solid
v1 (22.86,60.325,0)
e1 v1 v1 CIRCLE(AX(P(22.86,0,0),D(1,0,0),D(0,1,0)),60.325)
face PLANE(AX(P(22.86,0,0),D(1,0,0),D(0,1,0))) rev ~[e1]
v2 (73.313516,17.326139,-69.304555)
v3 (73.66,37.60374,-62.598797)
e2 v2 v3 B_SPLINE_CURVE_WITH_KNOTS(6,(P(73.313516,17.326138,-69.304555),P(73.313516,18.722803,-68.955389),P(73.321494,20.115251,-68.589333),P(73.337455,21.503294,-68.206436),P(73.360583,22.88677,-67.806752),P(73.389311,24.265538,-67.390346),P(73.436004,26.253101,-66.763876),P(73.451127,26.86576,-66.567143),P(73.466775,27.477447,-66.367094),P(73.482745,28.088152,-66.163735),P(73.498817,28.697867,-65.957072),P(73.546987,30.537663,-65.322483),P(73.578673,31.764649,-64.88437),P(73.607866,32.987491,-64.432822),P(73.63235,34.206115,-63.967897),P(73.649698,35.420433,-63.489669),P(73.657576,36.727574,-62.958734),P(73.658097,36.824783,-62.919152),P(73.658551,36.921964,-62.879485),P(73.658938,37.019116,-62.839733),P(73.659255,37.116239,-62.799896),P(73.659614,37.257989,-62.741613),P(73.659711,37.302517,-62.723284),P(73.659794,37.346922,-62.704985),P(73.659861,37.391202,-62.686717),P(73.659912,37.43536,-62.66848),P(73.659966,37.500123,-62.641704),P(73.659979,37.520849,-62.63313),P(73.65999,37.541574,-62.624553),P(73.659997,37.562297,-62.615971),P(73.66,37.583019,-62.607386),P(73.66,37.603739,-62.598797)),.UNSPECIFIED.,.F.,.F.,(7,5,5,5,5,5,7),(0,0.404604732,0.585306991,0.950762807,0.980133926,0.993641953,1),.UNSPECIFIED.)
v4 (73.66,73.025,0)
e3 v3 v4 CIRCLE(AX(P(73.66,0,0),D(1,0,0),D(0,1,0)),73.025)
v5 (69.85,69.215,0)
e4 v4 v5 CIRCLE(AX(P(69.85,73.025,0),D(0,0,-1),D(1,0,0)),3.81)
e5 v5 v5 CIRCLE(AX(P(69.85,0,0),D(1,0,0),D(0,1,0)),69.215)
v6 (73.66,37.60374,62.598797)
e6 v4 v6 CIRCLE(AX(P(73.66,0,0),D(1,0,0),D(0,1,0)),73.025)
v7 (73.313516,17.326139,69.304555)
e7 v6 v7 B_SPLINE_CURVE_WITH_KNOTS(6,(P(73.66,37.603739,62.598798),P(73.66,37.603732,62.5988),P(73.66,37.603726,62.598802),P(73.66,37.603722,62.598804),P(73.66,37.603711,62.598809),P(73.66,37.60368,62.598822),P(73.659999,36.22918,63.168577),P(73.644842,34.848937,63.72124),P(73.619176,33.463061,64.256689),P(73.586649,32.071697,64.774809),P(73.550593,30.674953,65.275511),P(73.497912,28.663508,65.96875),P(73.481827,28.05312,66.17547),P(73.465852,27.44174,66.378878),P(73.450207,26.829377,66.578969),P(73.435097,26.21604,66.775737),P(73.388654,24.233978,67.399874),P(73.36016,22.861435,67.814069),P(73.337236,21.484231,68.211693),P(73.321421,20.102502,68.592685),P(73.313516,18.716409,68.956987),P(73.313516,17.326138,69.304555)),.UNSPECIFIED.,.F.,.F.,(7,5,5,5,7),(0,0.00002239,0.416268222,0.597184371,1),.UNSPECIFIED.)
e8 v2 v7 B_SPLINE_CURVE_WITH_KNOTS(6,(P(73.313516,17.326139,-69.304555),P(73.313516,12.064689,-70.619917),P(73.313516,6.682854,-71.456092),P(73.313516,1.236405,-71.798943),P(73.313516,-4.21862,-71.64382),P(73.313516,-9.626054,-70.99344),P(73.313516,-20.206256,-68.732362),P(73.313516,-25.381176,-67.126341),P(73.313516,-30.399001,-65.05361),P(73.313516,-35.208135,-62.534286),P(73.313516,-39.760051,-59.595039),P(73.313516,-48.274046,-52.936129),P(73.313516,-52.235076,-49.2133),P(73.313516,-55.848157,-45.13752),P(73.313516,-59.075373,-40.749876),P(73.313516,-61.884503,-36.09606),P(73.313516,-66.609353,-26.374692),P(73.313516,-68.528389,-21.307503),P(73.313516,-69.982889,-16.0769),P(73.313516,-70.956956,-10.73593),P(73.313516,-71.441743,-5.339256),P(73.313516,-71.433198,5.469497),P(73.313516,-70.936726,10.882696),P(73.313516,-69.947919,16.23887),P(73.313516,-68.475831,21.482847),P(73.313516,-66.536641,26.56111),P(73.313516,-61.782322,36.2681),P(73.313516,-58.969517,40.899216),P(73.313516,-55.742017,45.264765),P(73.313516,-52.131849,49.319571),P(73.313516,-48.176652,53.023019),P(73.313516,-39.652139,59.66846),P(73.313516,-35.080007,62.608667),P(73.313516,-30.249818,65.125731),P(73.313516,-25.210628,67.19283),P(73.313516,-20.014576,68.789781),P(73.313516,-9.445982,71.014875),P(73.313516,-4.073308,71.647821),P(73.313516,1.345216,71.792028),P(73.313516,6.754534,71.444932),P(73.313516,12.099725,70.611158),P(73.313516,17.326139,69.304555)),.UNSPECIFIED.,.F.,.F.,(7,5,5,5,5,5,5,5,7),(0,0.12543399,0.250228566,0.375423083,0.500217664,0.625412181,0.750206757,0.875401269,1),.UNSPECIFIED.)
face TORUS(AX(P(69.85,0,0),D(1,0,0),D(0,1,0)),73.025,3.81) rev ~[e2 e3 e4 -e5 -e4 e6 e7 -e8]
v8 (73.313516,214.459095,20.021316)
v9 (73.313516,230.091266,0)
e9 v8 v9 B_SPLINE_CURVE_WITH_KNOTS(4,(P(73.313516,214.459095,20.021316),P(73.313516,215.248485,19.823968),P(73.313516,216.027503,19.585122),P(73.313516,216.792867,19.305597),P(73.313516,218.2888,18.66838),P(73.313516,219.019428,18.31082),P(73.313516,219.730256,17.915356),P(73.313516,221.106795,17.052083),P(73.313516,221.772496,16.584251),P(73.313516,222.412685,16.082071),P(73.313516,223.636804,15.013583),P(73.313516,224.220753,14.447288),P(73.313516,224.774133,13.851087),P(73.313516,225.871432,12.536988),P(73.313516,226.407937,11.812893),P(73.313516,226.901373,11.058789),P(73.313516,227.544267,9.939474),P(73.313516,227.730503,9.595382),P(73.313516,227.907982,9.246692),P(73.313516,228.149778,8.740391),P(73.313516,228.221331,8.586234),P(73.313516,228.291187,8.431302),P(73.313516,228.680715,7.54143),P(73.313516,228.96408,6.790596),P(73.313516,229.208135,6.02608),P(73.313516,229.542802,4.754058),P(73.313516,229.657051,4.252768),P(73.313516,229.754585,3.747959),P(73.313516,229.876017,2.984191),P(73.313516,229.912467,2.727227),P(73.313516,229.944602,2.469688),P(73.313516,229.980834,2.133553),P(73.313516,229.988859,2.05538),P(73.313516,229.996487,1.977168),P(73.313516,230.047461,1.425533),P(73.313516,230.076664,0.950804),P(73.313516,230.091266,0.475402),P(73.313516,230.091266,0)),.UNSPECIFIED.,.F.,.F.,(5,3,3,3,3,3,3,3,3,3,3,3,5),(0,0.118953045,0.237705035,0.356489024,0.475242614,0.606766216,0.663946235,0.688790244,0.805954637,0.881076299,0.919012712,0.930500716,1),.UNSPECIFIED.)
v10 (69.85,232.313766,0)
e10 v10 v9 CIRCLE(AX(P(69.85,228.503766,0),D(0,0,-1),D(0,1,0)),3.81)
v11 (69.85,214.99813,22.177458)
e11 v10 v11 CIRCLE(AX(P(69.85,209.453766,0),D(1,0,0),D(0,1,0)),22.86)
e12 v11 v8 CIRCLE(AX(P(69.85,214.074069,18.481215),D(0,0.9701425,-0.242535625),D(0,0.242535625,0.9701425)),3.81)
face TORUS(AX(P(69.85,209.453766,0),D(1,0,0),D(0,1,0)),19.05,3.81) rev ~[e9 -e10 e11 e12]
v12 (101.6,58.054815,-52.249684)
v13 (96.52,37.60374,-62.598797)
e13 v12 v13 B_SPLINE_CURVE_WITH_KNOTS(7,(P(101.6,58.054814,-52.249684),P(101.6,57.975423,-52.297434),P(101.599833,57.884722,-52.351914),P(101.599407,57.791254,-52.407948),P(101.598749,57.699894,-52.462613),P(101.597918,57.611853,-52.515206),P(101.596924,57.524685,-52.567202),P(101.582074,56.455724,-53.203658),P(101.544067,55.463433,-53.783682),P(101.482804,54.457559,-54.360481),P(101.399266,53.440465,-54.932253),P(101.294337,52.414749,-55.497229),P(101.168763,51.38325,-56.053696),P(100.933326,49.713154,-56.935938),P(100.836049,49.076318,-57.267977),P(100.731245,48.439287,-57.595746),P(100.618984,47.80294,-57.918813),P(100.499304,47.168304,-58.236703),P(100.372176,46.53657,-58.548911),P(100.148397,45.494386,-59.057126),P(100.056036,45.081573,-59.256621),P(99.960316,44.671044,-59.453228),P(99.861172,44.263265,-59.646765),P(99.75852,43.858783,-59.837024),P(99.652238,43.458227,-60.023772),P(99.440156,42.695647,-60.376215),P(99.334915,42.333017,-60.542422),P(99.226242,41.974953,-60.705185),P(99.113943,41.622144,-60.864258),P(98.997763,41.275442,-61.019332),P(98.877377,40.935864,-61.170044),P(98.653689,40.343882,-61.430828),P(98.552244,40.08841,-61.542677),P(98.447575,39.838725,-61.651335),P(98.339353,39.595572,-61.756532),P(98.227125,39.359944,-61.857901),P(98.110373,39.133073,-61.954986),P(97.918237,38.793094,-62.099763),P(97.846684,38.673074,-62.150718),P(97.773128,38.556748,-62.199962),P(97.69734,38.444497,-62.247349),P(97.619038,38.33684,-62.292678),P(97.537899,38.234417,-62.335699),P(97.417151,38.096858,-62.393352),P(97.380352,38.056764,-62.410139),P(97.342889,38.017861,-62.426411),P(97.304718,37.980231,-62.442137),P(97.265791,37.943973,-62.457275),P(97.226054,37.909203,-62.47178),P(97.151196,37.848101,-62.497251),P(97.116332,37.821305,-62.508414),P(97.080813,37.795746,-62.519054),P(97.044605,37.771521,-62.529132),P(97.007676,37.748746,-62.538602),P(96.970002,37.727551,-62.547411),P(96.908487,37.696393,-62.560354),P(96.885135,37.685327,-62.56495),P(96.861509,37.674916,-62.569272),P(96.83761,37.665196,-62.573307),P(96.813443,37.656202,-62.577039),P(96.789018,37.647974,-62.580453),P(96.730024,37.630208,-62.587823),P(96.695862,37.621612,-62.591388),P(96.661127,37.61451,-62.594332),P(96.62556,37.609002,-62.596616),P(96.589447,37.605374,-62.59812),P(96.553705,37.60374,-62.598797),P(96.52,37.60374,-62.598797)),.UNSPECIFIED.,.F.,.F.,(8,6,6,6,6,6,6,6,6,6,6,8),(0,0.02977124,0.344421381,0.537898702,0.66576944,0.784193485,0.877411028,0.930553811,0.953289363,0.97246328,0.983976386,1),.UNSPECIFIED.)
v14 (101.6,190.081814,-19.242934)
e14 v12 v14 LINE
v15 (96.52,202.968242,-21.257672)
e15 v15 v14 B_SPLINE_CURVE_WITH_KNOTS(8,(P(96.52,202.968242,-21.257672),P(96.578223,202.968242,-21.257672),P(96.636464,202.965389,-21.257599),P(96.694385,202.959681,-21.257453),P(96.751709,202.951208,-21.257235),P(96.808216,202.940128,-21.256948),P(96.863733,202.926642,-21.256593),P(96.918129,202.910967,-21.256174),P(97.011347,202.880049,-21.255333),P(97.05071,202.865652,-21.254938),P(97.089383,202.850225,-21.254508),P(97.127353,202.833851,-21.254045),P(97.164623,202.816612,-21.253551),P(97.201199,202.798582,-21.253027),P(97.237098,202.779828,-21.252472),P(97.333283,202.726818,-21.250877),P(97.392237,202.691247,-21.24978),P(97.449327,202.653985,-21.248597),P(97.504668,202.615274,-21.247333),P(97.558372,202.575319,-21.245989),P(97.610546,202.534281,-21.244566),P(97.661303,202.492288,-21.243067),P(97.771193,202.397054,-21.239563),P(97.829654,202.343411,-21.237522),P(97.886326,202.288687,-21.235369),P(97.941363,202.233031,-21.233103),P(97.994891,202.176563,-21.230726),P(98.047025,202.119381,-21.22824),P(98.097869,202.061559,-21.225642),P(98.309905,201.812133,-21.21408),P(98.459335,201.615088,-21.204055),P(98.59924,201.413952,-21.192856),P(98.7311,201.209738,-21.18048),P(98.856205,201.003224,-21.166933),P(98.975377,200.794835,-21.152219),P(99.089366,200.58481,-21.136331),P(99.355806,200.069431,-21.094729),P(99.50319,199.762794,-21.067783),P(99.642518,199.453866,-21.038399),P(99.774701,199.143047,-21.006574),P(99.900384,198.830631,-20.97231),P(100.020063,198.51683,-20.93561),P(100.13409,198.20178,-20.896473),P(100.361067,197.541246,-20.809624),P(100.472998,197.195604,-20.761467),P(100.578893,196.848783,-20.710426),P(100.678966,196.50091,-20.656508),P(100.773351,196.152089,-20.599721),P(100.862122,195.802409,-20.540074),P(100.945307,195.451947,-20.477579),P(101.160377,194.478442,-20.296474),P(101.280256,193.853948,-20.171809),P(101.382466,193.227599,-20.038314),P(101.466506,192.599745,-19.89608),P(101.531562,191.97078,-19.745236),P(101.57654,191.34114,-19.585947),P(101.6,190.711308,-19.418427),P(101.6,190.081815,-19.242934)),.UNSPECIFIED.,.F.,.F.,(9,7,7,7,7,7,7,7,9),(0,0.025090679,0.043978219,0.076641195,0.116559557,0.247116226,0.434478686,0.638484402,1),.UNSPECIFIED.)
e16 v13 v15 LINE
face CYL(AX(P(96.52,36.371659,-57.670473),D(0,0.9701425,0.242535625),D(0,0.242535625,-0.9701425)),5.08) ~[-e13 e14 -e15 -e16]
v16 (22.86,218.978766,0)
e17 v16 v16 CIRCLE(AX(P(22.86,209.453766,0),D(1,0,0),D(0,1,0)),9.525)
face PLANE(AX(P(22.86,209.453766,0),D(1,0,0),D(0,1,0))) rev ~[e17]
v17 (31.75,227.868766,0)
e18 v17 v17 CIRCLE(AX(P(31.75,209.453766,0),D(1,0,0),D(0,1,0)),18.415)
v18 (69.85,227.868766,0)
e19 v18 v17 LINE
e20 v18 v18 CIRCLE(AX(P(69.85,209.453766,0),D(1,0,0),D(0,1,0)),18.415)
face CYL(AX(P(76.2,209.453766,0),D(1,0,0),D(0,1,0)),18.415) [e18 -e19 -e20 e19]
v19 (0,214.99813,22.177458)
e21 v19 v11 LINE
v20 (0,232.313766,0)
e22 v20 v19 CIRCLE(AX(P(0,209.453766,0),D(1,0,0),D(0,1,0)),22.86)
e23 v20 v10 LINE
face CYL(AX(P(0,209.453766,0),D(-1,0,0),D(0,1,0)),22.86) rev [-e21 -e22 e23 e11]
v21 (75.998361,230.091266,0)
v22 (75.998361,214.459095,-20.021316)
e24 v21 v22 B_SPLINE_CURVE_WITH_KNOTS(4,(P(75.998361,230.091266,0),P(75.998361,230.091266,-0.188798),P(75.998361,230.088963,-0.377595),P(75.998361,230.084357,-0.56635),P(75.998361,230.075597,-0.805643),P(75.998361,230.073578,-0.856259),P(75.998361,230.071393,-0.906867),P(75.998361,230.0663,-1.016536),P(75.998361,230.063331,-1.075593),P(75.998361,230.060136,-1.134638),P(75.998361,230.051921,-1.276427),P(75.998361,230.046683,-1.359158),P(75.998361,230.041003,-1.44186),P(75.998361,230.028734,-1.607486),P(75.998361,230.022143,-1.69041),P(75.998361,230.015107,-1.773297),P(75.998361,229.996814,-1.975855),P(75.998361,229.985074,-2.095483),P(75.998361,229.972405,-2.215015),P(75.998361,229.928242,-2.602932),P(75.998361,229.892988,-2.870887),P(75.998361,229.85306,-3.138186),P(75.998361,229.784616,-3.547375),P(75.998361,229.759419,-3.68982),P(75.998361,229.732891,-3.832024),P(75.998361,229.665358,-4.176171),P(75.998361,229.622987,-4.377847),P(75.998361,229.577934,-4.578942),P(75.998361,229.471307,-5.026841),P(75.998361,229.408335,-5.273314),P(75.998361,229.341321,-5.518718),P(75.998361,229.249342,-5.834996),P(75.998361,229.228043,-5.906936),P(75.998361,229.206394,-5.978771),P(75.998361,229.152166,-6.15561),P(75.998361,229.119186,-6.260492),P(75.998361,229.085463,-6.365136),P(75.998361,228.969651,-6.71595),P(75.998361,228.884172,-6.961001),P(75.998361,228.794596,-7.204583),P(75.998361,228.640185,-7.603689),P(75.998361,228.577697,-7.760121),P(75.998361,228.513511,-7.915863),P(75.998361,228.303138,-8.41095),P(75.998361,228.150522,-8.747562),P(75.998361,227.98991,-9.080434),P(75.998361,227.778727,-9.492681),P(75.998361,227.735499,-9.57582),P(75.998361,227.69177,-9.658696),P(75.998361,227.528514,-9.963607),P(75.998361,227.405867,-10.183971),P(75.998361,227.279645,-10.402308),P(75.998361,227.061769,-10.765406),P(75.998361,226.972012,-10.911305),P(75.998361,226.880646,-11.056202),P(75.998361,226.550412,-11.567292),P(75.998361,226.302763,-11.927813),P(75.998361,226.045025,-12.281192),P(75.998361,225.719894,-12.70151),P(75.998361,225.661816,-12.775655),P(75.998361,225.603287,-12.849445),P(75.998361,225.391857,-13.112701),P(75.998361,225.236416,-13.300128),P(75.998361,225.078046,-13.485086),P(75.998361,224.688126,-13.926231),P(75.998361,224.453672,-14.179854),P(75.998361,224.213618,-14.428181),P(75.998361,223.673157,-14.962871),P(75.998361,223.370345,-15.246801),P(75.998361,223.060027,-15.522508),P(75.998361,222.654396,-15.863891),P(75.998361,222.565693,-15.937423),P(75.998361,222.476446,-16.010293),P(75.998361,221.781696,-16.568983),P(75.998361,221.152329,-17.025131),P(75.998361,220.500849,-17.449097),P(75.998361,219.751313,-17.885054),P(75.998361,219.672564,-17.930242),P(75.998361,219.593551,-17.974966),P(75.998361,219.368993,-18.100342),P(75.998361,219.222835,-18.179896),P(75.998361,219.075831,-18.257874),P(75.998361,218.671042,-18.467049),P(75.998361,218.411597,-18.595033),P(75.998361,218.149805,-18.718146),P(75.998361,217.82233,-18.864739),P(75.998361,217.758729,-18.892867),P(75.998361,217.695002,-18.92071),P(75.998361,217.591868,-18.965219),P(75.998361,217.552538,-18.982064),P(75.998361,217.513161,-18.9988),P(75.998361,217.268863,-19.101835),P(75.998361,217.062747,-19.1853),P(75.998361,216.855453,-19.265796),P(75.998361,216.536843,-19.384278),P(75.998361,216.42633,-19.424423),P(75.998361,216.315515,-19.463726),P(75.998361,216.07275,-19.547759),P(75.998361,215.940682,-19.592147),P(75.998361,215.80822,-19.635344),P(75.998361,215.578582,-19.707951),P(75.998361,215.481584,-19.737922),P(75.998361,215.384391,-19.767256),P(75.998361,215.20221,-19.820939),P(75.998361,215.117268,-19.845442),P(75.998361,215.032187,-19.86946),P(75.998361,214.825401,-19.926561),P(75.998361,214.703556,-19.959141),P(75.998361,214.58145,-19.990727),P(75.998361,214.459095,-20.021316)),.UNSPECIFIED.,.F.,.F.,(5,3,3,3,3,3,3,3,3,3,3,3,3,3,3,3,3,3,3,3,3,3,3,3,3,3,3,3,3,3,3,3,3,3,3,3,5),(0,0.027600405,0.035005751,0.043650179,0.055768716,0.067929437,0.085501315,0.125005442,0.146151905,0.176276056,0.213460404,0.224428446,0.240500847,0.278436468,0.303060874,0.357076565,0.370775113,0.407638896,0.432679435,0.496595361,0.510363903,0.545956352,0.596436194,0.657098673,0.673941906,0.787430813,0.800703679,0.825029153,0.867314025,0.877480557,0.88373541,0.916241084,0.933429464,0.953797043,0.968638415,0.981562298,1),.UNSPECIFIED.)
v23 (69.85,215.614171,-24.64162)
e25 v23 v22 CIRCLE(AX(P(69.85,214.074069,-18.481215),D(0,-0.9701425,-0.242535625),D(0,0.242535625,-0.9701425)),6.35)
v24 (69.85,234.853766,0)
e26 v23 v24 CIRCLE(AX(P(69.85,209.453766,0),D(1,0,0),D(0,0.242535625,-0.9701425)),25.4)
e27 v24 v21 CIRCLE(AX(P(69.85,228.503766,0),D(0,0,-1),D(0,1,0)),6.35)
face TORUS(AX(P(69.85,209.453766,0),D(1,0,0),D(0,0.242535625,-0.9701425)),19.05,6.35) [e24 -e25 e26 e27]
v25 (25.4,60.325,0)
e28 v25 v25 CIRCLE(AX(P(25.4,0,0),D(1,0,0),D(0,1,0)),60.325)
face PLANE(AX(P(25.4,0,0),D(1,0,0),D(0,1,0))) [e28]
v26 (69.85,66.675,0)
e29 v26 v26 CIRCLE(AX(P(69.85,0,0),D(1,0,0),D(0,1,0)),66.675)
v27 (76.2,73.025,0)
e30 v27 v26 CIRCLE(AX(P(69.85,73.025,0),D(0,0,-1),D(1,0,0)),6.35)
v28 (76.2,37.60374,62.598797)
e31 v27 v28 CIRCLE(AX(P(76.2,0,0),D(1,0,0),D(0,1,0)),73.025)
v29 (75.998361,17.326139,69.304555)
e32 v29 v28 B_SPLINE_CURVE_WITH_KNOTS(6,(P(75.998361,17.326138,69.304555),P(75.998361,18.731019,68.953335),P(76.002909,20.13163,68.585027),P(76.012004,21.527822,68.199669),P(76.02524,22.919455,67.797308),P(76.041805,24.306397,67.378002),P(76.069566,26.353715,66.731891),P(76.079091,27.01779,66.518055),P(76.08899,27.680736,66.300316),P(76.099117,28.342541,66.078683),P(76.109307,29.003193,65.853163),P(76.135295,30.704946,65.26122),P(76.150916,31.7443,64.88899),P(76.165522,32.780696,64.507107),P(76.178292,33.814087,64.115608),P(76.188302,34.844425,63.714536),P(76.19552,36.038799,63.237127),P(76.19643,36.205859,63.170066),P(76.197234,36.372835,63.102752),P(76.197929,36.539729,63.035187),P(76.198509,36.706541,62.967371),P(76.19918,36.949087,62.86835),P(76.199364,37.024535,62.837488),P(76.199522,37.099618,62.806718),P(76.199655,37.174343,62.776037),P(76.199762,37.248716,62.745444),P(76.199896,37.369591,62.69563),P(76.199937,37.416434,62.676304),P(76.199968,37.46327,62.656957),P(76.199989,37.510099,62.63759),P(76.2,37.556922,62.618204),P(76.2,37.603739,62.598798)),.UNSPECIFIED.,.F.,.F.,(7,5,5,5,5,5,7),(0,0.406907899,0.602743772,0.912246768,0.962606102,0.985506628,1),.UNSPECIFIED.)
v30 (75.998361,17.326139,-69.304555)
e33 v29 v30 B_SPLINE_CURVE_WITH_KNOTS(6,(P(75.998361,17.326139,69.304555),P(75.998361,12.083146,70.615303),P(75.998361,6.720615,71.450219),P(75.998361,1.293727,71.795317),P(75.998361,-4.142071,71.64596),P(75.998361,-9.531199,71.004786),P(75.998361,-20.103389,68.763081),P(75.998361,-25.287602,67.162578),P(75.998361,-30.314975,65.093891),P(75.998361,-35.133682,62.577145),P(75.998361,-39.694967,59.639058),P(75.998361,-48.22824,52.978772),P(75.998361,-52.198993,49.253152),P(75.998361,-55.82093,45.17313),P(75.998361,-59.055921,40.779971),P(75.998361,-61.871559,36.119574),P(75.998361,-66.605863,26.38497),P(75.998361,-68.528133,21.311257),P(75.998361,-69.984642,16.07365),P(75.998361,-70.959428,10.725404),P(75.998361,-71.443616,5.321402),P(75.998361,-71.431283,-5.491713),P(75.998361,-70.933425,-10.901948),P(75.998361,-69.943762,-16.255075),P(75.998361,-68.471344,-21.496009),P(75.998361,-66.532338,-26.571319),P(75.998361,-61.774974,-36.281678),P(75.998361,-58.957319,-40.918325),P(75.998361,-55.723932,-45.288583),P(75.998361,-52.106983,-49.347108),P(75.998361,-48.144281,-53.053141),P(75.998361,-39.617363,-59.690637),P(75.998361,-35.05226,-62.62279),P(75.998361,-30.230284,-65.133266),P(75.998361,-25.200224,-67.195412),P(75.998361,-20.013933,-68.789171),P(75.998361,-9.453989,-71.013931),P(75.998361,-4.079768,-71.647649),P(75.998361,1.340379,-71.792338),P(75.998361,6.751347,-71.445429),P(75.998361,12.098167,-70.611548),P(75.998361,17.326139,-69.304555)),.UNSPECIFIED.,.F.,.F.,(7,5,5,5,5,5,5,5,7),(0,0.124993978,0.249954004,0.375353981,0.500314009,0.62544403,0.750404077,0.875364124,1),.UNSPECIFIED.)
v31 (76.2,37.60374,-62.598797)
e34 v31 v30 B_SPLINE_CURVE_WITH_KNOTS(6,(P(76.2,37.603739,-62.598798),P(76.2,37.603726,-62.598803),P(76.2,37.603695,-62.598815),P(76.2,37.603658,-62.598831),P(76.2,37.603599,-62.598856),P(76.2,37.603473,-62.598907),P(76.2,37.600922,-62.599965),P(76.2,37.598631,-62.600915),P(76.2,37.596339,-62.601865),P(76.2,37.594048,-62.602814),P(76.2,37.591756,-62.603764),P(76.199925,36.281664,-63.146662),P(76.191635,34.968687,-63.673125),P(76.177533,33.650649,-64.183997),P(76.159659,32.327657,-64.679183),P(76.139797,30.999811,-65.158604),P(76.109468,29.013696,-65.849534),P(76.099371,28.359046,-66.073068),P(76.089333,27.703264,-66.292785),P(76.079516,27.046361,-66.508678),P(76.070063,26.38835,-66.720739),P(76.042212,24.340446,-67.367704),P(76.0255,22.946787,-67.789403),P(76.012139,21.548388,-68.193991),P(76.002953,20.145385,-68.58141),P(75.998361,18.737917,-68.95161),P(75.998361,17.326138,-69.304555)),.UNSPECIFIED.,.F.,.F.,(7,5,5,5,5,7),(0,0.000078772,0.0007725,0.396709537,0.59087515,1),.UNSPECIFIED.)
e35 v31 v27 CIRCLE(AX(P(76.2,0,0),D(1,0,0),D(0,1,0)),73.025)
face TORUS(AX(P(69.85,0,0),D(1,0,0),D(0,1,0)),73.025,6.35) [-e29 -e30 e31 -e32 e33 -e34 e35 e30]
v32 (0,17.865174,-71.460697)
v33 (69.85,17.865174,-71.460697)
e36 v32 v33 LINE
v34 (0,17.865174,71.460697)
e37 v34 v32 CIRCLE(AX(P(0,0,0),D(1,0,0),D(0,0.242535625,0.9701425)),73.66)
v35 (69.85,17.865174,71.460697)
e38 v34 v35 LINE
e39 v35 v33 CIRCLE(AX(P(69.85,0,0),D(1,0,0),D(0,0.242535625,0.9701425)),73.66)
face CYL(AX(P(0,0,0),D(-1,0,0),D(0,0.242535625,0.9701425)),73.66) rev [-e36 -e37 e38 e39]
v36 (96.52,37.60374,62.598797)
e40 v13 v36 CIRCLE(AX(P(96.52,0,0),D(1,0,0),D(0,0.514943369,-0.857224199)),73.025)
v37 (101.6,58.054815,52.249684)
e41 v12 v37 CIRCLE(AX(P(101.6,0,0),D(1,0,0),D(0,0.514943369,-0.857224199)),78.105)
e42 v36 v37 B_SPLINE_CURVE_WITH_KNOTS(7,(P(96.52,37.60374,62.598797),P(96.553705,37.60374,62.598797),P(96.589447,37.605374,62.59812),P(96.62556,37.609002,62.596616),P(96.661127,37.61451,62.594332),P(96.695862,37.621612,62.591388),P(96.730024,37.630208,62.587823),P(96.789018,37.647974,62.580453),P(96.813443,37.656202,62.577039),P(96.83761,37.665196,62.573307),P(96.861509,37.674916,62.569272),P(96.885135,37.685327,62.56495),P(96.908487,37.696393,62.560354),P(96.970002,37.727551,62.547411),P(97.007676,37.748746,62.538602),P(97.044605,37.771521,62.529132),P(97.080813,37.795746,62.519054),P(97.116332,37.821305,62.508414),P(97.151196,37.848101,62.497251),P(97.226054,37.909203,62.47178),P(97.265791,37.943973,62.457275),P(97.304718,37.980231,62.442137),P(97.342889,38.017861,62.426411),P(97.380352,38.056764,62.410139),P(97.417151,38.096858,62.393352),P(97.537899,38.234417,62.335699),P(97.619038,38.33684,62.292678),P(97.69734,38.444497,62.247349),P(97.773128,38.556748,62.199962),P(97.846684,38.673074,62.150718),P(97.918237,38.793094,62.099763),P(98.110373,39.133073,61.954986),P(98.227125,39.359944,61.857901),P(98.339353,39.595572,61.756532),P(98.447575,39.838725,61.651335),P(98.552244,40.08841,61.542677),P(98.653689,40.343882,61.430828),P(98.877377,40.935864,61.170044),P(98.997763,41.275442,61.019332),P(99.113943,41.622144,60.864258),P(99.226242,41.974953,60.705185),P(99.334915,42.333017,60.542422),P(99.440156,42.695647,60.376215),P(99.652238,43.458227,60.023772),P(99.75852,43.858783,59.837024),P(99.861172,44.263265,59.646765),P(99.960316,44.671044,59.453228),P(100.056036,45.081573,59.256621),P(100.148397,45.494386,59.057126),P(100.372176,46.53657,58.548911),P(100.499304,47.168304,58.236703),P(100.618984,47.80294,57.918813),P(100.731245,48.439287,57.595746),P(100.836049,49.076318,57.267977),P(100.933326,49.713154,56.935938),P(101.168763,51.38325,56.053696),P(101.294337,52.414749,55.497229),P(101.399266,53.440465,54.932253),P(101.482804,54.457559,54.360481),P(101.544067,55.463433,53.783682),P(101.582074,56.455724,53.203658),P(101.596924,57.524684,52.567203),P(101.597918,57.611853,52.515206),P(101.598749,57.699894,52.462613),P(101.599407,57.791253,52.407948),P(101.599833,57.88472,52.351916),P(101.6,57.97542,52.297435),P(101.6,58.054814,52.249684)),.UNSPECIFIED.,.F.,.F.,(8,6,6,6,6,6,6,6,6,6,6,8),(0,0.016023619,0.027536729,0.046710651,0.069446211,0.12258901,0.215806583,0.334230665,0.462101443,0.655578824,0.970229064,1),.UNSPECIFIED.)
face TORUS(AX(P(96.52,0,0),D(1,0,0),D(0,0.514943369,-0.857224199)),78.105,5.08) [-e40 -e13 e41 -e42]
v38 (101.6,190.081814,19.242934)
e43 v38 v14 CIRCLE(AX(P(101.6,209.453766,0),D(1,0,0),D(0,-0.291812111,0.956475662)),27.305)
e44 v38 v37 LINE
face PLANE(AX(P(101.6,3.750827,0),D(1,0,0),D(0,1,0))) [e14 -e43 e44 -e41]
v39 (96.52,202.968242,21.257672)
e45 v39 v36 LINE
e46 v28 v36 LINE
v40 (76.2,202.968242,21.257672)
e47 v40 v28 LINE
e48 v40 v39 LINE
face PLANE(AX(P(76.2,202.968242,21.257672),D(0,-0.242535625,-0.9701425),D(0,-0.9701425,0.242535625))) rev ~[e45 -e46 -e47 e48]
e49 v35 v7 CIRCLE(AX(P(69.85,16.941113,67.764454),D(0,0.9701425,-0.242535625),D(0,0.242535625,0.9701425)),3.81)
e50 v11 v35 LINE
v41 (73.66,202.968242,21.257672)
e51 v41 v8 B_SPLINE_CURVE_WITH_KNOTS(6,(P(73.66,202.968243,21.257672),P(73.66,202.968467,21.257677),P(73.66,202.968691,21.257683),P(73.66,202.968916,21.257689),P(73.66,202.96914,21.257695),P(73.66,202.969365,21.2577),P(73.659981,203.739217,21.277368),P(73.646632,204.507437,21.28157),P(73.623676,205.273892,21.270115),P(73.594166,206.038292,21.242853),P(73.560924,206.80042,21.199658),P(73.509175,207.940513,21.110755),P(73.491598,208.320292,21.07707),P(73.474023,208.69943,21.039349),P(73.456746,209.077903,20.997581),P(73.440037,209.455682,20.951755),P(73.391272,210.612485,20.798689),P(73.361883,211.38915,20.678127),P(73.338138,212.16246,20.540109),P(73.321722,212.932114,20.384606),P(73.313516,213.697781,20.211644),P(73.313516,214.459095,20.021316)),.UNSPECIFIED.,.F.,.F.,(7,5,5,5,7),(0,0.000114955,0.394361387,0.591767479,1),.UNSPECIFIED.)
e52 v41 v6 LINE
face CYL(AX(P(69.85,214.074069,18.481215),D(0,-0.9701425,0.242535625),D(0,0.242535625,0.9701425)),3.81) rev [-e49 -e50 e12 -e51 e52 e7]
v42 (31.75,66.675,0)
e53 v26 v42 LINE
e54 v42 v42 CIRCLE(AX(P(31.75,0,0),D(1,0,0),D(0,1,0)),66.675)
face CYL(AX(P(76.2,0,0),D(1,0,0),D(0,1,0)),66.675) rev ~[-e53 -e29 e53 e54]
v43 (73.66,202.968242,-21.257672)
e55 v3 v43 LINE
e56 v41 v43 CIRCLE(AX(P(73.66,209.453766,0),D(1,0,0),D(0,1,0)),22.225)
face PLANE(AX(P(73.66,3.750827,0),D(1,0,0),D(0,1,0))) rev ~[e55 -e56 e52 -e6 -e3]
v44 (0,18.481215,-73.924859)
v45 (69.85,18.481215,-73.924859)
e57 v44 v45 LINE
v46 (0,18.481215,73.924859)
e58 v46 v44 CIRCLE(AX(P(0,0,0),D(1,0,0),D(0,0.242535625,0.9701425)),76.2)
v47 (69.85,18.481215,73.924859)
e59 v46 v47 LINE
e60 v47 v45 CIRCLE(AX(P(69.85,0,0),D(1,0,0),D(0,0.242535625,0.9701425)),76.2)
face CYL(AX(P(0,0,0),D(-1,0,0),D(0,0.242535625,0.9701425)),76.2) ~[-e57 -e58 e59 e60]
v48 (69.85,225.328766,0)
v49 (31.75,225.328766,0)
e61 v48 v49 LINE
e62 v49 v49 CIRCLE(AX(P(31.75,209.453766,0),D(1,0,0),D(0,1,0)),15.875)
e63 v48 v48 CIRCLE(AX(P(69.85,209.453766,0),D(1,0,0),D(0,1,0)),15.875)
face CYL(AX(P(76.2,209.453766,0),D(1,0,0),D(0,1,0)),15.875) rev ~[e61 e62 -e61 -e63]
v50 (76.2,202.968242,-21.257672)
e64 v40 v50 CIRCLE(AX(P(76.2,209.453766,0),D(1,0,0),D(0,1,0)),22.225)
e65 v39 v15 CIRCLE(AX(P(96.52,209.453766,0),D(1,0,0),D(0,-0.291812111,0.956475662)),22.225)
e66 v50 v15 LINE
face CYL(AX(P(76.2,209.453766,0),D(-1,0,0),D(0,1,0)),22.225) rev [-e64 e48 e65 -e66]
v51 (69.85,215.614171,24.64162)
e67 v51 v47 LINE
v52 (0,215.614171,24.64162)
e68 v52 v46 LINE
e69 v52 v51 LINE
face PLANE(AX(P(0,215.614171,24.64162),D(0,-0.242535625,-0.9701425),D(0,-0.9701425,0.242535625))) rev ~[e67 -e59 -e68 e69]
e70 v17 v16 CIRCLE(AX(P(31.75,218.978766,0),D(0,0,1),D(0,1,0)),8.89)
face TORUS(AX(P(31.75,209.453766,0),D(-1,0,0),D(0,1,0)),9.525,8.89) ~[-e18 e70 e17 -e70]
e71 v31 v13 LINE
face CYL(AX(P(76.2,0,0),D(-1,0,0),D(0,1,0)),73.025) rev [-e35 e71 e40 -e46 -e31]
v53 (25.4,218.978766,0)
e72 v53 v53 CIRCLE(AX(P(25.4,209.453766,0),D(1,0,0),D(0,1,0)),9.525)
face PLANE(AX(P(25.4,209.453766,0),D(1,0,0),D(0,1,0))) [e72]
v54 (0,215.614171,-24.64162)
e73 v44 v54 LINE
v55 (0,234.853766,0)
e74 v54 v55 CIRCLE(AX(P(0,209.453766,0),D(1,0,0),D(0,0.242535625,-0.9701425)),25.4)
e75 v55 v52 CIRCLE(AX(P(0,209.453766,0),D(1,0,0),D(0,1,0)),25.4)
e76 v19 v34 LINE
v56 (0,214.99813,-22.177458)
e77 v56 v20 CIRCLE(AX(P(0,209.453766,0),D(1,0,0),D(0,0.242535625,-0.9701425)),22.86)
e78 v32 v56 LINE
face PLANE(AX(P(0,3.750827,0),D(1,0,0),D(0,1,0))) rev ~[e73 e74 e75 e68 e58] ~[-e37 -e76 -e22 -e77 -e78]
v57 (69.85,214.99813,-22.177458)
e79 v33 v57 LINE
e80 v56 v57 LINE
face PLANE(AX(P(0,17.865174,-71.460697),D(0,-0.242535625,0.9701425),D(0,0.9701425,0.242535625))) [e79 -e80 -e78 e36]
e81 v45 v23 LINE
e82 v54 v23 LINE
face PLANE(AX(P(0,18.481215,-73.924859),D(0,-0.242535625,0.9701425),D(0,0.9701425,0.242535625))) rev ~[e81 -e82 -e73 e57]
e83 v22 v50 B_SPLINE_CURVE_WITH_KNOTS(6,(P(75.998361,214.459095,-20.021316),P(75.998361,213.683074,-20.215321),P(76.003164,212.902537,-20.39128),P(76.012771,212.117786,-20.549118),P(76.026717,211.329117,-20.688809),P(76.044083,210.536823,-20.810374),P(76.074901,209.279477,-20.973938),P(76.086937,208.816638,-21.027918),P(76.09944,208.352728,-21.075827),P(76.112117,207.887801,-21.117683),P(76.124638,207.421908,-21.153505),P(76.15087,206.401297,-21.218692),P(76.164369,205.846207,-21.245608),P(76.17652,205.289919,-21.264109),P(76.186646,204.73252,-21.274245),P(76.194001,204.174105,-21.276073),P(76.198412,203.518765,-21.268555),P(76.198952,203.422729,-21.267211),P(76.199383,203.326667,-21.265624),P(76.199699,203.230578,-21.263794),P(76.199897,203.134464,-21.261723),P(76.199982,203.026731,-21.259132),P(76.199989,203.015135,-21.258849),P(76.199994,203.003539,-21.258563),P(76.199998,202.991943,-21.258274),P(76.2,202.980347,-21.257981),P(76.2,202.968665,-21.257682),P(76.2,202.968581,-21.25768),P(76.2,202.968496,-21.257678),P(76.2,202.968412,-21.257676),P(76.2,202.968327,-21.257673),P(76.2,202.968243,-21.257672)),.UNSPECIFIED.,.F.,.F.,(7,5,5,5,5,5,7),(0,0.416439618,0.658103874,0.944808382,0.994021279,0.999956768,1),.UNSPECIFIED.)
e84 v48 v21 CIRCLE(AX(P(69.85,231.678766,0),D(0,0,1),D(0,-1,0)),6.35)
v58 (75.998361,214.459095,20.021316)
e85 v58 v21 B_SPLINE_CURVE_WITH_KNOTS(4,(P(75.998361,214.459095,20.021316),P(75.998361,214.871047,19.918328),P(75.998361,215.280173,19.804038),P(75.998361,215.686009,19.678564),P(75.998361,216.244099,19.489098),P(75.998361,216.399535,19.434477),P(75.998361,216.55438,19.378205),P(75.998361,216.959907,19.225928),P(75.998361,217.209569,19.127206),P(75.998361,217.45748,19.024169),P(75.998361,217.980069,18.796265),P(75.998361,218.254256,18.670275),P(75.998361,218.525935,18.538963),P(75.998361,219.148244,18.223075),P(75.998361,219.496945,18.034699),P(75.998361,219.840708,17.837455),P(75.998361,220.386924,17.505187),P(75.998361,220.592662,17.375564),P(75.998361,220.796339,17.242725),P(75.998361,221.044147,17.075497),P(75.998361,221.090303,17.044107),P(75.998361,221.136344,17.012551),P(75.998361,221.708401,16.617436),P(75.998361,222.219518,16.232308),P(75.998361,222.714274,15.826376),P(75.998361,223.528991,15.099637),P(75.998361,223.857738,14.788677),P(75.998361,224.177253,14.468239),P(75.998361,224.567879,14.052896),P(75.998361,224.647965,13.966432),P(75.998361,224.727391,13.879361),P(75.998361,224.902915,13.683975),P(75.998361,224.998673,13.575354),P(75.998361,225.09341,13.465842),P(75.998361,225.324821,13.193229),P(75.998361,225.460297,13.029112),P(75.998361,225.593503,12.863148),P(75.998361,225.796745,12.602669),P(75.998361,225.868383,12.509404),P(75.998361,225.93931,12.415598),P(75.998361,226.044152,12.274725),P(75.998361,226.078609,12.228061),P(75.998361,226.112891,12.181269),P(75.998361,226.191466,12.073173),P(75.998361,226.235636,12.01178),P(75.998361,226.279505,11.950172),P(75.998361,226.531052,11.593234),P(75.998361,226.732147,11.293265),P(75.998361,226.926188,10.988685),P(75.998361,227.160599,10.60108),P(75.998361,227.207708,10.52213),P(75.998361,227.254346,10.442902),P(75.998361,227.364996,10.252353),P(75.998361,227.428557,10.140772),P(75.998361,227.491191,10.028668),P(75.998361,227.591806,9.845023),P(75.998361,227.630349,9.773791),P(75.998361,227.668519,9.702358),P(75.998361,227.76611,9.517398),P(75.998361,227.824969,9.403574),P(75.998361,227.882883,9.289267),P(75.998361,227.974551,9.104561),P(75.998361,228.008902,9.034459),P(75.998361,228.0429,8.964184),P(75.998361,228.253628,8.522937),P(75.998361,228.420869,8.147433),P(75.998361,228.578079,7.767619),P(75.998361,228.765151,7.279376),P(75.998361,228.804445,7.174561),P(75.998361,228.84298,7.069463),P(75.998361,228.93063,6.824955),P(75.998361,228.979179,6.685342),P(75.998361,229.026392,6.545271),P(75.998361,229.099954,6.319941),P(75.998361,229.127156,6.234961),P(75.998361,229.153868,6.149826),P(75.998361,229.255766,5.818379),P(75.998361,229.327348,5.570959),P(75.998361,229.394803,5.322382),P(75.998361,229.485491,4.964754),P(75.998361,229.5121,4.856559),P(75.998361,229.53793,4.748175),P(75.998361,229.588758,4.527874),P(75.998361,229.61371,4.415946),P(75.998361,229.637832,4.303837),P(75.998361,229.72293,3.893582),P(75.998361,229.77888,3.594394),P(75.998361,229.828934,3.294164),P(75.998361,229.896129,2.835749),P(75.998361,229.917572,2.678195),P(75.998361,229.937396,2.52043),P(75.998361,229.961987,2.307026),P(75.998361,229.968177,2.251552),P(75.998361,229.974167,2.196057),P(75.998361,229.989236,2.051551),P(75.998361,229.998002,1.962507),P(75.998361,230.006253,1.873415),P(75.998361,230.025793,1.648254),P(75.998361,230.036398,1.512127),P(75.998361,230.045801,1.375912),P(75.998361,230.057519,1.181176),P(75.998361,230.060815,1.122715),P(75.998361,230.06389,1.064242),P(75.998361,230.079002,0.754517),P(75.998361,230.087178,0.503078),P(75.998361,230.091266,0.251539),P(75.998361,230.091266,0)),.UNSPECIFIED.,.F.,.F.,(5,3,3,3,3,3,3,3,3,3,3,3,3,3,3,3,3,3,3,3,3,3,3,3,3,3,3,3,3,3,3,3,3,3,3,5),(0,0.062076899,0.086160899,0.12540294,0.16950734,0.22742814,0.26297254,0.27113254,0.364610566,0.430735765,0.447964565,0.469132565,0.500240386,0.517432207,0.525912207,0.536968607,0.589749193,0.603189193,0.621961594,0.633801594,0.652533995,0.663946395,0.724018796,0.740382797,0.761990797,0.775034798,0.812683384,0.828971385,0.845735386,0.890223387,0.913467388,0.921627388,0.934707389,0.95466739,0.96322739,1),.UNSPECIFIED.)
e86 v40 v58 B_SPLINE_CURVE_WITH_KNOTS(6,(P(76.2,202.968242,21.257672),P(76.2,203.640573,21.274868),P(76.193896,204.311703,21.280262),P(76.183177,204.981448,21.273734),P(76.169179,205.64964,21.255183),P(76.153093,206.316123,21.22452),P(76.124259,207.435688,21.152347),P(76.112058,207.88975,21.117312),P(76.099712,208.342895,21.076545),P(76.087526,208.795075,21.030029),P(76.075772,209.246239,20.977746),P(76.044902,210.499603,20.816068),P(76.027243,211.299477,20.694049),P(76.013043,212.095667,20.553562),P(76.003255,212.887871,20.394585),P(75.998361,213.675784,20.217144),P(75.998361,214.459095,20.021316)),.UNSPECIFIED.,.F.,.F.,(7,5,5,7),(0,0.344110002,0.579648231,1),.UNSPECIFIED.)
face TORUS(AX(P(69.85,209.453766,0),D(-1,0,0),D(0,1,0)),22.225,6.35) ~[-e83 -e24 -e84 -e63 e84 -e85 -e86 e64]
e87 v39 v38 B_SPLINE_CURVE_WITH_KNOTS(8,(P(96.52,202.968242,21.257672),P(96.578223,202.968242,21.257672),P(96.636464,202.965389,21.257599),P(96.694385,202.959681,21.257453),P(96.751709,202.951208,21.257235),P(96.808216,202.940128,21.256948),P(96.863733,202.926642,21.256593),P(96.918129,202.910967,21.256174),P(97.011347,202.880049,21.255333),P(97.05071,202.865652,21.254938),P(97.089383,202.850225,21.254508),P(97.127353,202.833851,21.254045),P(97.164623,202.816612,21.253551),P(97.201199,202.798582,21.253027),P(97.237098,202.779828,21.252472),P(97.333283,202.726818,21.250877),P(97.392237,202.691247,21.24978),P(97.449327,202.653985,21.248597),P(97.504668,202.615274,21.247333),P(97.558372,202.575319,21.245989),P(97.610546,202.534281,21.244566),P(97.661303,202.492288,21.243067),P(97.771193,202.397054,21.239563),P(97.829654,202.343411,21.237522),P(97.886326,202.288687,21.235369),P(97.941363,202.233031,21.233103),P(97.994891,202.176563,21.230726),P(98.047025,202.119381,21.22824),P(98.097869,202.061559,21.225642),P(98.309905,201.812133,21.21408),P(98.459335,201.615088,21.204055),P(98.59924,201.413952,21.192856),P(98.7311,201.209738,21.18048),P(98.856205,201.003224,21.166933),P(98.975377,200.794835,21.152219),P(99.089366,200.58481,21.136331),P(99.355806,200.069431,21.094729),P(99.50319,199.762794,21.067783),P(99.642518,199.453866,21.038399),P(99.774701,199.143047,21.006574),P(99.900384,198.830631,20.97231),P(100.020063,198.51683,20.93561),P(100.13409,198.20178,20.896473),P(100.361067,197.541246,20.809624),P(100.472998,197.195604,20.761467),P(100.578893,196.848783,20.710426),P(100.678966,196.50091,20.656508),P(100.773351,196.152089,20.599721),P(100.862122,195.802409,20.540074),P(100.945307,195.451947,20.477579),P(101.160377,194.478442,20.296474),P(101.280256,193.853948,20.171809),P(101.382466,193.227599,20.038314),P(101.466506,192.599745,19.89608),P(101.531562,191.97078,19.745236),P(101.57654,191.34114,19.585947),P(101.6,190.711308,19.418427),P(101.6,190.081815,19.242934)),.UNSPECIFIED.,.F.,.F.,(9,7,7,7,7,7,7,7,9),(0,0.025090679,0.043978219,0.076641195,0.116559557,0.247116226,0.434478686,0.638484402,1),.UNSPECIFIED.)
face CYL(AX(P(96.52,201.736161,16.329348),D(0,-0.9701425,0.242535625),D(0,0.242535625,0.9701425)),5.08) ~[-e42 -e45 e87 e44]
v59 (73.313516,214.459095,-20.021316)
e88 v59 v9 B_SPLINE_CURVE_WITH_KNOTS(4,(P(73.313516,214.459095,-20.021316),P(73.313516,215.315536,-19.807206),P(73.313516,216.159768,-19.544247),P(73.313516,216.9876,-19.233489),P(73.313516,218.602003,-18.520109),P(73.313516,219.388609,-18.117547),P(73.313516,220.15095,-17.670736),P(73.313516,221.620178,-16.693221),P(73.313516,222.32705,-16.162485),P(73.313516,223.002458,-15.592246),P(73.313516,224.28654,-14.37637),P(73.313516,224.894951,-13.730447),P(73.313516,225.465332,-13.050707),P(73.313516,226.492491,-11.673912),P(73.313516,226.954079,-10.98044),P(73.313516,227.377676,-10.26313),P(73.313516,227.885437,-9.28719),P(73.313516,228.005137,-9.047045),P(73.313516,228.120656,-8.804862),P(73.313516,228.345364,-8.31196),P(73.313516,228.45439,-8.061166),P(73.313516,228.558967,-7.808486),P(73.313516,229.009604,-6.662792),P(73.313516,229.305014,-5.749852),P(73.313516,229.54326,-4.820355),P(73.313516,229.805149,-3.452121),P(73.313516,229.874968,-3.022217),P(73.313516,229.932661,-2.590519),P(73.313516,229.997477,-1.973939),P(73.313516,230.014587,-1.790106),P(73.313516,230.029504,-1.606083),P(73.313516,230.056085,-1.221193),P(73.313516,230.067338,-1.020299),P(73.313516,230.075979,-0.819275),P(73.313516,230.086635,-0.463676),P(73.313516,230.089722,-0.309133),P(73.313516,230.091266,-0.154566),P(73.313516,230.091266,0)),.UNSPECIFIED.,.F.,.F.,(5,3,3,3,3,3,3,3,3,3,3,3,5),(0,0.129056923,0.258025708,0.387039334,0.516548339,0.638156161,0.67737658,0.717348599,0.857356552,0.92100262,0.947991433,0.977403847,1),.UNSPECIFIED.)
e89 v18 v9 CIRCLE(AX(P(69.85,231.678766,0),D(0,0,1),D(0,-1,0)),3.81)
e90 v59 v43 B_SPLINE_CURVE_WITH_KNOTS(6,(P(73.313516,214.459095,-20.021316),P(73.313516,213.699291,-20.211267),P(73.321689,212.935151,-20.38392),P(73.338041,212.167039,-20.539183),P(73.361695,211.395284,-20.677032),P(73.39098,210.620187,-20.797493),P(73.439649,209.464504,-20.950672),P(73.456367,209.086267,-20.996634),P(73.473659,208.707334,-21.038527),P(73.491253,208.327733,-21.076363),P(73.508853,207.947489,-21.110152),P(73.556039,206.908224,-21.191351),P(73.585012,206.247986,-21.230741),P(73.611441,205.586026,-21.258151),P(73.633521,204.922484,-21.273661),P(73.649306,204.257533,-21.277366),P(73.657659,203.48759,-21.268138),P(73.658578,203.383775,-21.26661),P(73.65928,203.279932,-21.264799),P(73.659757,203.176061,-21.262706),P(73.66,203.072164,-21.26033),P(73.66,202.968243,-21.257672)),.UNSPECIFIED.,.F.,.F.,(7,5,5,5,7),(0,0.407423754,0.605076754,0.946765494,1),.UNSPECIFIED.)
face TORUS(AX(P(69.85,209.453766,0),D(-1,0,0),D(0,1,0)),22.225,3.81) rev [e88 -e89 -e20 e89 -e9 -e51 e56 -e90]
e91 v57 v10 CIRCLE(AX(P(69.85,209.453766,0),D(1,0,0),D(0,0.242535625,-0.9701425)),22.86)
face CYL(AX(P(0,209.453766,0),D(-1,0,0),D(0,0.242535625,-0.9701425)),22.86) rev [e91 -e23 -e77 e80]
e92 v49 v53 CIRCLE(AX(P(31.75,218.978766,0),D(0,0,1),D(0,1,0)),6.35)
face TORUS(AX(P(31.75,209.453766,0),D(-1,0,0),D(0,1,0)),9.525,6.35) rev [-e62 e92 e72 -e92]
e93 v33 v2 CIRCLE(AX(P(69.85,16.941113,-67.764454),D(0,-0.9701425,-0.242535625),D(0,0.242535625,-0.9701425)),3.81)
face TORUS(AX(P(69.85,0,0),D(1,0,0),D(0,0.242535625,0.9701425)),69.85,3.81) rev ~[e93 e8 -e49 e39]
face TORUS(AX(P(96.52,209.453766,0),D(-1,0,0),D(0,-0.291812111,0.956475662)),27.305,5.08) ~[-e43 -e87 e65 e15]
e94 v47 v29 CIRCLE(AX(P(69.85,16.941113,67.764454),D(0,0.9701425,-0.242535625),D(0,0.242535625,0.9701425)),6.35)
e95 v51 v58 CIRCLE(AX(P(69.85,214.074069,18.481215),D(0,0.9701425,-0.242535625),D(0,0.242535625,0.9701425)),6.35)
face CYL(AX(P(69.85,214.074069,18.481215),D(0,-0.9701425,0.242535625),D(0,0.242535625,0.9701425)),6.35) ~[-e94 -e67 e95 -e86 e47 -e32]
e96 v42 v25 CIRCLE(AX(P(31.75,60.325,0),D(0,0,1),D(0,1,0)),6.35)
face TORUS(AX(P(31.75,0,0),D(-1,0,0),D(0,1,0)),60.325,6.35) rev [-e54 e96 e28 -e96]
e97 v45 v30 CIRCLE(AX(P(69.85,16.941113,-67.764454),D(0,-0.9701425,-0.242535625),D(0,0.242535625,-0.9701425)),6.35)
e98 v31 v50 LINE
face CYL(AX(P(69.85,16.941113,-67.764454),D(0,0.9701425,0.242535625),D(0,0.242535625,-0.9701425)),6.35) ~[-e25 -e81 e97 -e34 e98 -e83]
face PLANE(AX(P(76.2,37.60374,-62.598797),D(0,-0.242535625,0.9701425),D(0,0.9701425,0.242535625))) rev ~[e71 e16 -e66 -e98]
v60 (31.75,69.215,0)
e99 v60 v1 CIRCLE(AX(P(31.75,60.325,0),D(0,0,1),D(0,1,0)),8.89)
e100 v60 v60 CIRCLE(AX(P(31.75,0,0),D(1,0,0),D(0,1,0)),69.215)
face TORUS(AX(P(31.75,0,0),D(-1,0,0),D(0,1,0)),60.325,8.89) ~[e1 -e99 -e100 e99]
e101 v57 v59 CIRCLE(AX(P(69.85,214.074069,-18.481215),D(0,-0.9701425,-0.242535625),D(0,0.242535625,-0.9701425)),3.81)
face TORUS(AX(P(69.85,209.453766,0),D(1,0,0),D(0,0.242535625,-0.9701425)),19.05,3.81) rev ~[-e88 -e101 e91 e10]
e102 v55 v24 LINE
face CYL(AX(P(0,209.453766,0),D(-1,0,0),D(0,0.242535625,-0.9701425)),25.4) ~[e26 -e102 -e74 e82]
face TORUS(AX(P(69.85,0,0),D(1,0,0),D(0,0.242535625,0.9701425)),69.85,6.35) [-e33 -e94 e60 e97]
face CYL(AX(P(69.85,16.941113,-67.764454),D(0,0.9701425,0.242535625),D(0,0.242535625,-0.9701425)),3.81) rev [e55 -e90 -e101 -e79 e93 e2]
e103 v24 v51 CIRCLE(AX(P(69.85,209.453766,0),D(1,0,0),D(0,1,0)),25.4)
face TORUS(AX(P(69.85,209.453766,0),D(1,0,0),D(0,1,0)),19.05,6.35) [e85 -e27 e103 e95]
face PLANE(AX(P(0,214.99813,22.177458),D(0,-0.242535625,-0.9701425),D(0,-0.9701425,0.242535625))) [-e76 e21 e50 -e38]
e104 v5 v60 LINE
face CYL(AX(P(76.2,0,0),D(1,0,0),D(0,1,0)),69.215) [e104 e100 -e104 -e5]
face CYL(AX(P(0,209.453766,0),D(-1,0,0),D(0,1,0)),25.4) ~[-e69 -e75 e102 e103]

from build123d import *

# Parameters (mm, degrees)
F1_DEPTH = 76.2
F2_R     = 15.875
F2_R_2   = 66.675
F3_DEPTH = 50.8
F4_F1_R  = 6.35
F4_F2_R  = 6.35
F4_F3_R  = 6.35
F5_T     = -2.54
F6_DEPTH = 25.4
F7_R     = 5.08


# Not quite as in the source:
# - a fillet or chamfer that OpenCascade refuses, or shapes differently, is made with other operations: its cross-section is extruded or revolved along the edge and cut away or added


with BuildPart() as f1:
    # F0 (on Right) → F1 (new body)
    with BuildSketch(Plane.YZ):
        with BuildLine():
            ThreePointArc((18.4812146278, -73.9248585111), (60.0612543768, -46.8944103565), (76.2, 0))
            ThreePointArc((76.2, 0), (60.0612543768, 46.8944103565), (18.4812146278, 73.9248585111))
            ThreePointArc((18.4812146278, 73.9248585111), (-76.2, 0), (18.4812146278, -73.9248585111))
        make_face()
        with BuildLine():
            ThreePointArc((18.4812146278, 73.9248585111), (60.0612543768, 46.8944103565), (76.2, 0))
            ThreePointArc((76.2, 0), (60.0612543768, -46.8944103565), (18.4812146278, -73.9248585111))
            Line((18.4812146278, -73.9248585111), (215.6141706573, -24.6416195037))
            ThreePointArc((215.6141706573, -24.6416195037), (184.0537657814, 0), (215.6141706573, 24.6416195037))
            Line((215.6141706573, 24.6416195037), (18.4812146278, 73.9248585111))
        make_face()
        with BuildLine():
            ThreePointArc((234.8537657814, 0), (229.474183907, 15.6314701188), (215.6141706573, 24.6416195037))
            ThreePointArc((215.6141706573, 24.6416195037), (184.0537657814, 0), (215.6141706573, -24.6416195037))
            ThreePointArc((215.6141706573, -24.6416195037), (229.474183907, -15.6314701188), (234.8537657814, 0))
        make_face()
    extrude(amount=F1_DEPTH)

    # F2 (on face) → F3 (cut)
    with BuildSketch(Plane.YZ.offset(76.2)):
        with Locations((209.4537657814, 0)):
            Circle(F2_R)
        Circle(F2_R_2)
    extrude(amount=-F3_DEPTH, mode=Mode.SUBTRACT)

    # F4: fillet of radius 6.35 on 8 edges, made by hand

    # F4_f1
    f4_f1_edges = [f1.edges().sort_by_distance(p)[0] for p in [
        (76.2, -76.2, 0),
        (76.2, 117.0476926425, 49.2832390074),
        (76.2, 117.0476926425, -49.2832390074),
        (76.2, 234.8537657814, 0),
    ]]
    fillet(f4_f1_edges, radius=F4_F1_R)

    # F4_f2
    f4_f2_edges = [f1.edges().sort_by_distance(p)[0] for p in [
        (25.4, -66.675, 0),
    ]]
    fillet(f4_f2_edges, radius=F4_F2_R)

    # F4_f3
    f4_f3_edges = [f1.edges().sort_by_distance(p)[0] for p in [
        (25.4, 193.5787657814, 0),
    ]]
    fillet(f4_f3_edges, radius=F4_F3_R)

    # F4_s4 → F4_t5 (revolve, cut)
    with BuildSketch(Plane.XY):
        with BuildLine():
            ThreePointArc((76.2, 73.025), (74.3401280605, 68.5348719395), (69.85, 66.675))
            Line((69.85, 66.675), (69.85, 66.548))
            Line((69.85, 66.548), (76.327, 66.548))
            Line((76.327, 66.548), (76.327, 73.025))
            Line((76.327, 73.025), (76.2, 73.025))
        make_face()
    revolve(axis=Axis((76.2, 0, 0), (1, 0, 0)), mode=Mode.SUBTRACT)

    # F4_s6 → F4_t7 (revolve, cut)
    with BuildSketch(Plane.XY):
        with BuildLine():
            ThreePointArc((69.85, 225.3287657814), (74.3401280605, 227.1886377208), (76.2, 231.6787657814))
            Line((76.2, 231.6787657814), (76.327, 231.6787657814))
            Line((76.327, 231.6787657814), (76.327, 225.2017657814))
            Line((76.327, 225.2017657814), (69.85, 225.2017657814))
            Line((69.85, 225.2017657814), (69.85, 225.3287657814))
        make_face()
    revolve(axis=Axis((76.2, 209.4537657814, 0), (1, 0, 0)), mode=Mode.SUBTRACT)

    # F5
    f5_openings = [f1.faces().sort_by_distance(p)[0] for p in [
        (0, 57.51924, 0),
    ]]
    offset(amount=F5_T, openings=f5_openings)

    # F6 (add): a face of the model
    f6_faces = [f1.faces().sort_by_distance(p)[0] for p in [
        (76.2, 119.1189366743, 0),
    ]]
    extrude(f6_faces, amount=F6_DEPTH)

    # F7
    f7_edges = [f1.edges().sort_by_distance(p)[0] for p in [
        (101.6, 187.228766, 0),
        (101.6, 120.285991, 41.928234),
        (101.6, 73.025, 0),
        (101.6, 120.285991, -41.928234),
    ]]
    fillet(f7_edges, radius=F7_R)


solid = f1.part
